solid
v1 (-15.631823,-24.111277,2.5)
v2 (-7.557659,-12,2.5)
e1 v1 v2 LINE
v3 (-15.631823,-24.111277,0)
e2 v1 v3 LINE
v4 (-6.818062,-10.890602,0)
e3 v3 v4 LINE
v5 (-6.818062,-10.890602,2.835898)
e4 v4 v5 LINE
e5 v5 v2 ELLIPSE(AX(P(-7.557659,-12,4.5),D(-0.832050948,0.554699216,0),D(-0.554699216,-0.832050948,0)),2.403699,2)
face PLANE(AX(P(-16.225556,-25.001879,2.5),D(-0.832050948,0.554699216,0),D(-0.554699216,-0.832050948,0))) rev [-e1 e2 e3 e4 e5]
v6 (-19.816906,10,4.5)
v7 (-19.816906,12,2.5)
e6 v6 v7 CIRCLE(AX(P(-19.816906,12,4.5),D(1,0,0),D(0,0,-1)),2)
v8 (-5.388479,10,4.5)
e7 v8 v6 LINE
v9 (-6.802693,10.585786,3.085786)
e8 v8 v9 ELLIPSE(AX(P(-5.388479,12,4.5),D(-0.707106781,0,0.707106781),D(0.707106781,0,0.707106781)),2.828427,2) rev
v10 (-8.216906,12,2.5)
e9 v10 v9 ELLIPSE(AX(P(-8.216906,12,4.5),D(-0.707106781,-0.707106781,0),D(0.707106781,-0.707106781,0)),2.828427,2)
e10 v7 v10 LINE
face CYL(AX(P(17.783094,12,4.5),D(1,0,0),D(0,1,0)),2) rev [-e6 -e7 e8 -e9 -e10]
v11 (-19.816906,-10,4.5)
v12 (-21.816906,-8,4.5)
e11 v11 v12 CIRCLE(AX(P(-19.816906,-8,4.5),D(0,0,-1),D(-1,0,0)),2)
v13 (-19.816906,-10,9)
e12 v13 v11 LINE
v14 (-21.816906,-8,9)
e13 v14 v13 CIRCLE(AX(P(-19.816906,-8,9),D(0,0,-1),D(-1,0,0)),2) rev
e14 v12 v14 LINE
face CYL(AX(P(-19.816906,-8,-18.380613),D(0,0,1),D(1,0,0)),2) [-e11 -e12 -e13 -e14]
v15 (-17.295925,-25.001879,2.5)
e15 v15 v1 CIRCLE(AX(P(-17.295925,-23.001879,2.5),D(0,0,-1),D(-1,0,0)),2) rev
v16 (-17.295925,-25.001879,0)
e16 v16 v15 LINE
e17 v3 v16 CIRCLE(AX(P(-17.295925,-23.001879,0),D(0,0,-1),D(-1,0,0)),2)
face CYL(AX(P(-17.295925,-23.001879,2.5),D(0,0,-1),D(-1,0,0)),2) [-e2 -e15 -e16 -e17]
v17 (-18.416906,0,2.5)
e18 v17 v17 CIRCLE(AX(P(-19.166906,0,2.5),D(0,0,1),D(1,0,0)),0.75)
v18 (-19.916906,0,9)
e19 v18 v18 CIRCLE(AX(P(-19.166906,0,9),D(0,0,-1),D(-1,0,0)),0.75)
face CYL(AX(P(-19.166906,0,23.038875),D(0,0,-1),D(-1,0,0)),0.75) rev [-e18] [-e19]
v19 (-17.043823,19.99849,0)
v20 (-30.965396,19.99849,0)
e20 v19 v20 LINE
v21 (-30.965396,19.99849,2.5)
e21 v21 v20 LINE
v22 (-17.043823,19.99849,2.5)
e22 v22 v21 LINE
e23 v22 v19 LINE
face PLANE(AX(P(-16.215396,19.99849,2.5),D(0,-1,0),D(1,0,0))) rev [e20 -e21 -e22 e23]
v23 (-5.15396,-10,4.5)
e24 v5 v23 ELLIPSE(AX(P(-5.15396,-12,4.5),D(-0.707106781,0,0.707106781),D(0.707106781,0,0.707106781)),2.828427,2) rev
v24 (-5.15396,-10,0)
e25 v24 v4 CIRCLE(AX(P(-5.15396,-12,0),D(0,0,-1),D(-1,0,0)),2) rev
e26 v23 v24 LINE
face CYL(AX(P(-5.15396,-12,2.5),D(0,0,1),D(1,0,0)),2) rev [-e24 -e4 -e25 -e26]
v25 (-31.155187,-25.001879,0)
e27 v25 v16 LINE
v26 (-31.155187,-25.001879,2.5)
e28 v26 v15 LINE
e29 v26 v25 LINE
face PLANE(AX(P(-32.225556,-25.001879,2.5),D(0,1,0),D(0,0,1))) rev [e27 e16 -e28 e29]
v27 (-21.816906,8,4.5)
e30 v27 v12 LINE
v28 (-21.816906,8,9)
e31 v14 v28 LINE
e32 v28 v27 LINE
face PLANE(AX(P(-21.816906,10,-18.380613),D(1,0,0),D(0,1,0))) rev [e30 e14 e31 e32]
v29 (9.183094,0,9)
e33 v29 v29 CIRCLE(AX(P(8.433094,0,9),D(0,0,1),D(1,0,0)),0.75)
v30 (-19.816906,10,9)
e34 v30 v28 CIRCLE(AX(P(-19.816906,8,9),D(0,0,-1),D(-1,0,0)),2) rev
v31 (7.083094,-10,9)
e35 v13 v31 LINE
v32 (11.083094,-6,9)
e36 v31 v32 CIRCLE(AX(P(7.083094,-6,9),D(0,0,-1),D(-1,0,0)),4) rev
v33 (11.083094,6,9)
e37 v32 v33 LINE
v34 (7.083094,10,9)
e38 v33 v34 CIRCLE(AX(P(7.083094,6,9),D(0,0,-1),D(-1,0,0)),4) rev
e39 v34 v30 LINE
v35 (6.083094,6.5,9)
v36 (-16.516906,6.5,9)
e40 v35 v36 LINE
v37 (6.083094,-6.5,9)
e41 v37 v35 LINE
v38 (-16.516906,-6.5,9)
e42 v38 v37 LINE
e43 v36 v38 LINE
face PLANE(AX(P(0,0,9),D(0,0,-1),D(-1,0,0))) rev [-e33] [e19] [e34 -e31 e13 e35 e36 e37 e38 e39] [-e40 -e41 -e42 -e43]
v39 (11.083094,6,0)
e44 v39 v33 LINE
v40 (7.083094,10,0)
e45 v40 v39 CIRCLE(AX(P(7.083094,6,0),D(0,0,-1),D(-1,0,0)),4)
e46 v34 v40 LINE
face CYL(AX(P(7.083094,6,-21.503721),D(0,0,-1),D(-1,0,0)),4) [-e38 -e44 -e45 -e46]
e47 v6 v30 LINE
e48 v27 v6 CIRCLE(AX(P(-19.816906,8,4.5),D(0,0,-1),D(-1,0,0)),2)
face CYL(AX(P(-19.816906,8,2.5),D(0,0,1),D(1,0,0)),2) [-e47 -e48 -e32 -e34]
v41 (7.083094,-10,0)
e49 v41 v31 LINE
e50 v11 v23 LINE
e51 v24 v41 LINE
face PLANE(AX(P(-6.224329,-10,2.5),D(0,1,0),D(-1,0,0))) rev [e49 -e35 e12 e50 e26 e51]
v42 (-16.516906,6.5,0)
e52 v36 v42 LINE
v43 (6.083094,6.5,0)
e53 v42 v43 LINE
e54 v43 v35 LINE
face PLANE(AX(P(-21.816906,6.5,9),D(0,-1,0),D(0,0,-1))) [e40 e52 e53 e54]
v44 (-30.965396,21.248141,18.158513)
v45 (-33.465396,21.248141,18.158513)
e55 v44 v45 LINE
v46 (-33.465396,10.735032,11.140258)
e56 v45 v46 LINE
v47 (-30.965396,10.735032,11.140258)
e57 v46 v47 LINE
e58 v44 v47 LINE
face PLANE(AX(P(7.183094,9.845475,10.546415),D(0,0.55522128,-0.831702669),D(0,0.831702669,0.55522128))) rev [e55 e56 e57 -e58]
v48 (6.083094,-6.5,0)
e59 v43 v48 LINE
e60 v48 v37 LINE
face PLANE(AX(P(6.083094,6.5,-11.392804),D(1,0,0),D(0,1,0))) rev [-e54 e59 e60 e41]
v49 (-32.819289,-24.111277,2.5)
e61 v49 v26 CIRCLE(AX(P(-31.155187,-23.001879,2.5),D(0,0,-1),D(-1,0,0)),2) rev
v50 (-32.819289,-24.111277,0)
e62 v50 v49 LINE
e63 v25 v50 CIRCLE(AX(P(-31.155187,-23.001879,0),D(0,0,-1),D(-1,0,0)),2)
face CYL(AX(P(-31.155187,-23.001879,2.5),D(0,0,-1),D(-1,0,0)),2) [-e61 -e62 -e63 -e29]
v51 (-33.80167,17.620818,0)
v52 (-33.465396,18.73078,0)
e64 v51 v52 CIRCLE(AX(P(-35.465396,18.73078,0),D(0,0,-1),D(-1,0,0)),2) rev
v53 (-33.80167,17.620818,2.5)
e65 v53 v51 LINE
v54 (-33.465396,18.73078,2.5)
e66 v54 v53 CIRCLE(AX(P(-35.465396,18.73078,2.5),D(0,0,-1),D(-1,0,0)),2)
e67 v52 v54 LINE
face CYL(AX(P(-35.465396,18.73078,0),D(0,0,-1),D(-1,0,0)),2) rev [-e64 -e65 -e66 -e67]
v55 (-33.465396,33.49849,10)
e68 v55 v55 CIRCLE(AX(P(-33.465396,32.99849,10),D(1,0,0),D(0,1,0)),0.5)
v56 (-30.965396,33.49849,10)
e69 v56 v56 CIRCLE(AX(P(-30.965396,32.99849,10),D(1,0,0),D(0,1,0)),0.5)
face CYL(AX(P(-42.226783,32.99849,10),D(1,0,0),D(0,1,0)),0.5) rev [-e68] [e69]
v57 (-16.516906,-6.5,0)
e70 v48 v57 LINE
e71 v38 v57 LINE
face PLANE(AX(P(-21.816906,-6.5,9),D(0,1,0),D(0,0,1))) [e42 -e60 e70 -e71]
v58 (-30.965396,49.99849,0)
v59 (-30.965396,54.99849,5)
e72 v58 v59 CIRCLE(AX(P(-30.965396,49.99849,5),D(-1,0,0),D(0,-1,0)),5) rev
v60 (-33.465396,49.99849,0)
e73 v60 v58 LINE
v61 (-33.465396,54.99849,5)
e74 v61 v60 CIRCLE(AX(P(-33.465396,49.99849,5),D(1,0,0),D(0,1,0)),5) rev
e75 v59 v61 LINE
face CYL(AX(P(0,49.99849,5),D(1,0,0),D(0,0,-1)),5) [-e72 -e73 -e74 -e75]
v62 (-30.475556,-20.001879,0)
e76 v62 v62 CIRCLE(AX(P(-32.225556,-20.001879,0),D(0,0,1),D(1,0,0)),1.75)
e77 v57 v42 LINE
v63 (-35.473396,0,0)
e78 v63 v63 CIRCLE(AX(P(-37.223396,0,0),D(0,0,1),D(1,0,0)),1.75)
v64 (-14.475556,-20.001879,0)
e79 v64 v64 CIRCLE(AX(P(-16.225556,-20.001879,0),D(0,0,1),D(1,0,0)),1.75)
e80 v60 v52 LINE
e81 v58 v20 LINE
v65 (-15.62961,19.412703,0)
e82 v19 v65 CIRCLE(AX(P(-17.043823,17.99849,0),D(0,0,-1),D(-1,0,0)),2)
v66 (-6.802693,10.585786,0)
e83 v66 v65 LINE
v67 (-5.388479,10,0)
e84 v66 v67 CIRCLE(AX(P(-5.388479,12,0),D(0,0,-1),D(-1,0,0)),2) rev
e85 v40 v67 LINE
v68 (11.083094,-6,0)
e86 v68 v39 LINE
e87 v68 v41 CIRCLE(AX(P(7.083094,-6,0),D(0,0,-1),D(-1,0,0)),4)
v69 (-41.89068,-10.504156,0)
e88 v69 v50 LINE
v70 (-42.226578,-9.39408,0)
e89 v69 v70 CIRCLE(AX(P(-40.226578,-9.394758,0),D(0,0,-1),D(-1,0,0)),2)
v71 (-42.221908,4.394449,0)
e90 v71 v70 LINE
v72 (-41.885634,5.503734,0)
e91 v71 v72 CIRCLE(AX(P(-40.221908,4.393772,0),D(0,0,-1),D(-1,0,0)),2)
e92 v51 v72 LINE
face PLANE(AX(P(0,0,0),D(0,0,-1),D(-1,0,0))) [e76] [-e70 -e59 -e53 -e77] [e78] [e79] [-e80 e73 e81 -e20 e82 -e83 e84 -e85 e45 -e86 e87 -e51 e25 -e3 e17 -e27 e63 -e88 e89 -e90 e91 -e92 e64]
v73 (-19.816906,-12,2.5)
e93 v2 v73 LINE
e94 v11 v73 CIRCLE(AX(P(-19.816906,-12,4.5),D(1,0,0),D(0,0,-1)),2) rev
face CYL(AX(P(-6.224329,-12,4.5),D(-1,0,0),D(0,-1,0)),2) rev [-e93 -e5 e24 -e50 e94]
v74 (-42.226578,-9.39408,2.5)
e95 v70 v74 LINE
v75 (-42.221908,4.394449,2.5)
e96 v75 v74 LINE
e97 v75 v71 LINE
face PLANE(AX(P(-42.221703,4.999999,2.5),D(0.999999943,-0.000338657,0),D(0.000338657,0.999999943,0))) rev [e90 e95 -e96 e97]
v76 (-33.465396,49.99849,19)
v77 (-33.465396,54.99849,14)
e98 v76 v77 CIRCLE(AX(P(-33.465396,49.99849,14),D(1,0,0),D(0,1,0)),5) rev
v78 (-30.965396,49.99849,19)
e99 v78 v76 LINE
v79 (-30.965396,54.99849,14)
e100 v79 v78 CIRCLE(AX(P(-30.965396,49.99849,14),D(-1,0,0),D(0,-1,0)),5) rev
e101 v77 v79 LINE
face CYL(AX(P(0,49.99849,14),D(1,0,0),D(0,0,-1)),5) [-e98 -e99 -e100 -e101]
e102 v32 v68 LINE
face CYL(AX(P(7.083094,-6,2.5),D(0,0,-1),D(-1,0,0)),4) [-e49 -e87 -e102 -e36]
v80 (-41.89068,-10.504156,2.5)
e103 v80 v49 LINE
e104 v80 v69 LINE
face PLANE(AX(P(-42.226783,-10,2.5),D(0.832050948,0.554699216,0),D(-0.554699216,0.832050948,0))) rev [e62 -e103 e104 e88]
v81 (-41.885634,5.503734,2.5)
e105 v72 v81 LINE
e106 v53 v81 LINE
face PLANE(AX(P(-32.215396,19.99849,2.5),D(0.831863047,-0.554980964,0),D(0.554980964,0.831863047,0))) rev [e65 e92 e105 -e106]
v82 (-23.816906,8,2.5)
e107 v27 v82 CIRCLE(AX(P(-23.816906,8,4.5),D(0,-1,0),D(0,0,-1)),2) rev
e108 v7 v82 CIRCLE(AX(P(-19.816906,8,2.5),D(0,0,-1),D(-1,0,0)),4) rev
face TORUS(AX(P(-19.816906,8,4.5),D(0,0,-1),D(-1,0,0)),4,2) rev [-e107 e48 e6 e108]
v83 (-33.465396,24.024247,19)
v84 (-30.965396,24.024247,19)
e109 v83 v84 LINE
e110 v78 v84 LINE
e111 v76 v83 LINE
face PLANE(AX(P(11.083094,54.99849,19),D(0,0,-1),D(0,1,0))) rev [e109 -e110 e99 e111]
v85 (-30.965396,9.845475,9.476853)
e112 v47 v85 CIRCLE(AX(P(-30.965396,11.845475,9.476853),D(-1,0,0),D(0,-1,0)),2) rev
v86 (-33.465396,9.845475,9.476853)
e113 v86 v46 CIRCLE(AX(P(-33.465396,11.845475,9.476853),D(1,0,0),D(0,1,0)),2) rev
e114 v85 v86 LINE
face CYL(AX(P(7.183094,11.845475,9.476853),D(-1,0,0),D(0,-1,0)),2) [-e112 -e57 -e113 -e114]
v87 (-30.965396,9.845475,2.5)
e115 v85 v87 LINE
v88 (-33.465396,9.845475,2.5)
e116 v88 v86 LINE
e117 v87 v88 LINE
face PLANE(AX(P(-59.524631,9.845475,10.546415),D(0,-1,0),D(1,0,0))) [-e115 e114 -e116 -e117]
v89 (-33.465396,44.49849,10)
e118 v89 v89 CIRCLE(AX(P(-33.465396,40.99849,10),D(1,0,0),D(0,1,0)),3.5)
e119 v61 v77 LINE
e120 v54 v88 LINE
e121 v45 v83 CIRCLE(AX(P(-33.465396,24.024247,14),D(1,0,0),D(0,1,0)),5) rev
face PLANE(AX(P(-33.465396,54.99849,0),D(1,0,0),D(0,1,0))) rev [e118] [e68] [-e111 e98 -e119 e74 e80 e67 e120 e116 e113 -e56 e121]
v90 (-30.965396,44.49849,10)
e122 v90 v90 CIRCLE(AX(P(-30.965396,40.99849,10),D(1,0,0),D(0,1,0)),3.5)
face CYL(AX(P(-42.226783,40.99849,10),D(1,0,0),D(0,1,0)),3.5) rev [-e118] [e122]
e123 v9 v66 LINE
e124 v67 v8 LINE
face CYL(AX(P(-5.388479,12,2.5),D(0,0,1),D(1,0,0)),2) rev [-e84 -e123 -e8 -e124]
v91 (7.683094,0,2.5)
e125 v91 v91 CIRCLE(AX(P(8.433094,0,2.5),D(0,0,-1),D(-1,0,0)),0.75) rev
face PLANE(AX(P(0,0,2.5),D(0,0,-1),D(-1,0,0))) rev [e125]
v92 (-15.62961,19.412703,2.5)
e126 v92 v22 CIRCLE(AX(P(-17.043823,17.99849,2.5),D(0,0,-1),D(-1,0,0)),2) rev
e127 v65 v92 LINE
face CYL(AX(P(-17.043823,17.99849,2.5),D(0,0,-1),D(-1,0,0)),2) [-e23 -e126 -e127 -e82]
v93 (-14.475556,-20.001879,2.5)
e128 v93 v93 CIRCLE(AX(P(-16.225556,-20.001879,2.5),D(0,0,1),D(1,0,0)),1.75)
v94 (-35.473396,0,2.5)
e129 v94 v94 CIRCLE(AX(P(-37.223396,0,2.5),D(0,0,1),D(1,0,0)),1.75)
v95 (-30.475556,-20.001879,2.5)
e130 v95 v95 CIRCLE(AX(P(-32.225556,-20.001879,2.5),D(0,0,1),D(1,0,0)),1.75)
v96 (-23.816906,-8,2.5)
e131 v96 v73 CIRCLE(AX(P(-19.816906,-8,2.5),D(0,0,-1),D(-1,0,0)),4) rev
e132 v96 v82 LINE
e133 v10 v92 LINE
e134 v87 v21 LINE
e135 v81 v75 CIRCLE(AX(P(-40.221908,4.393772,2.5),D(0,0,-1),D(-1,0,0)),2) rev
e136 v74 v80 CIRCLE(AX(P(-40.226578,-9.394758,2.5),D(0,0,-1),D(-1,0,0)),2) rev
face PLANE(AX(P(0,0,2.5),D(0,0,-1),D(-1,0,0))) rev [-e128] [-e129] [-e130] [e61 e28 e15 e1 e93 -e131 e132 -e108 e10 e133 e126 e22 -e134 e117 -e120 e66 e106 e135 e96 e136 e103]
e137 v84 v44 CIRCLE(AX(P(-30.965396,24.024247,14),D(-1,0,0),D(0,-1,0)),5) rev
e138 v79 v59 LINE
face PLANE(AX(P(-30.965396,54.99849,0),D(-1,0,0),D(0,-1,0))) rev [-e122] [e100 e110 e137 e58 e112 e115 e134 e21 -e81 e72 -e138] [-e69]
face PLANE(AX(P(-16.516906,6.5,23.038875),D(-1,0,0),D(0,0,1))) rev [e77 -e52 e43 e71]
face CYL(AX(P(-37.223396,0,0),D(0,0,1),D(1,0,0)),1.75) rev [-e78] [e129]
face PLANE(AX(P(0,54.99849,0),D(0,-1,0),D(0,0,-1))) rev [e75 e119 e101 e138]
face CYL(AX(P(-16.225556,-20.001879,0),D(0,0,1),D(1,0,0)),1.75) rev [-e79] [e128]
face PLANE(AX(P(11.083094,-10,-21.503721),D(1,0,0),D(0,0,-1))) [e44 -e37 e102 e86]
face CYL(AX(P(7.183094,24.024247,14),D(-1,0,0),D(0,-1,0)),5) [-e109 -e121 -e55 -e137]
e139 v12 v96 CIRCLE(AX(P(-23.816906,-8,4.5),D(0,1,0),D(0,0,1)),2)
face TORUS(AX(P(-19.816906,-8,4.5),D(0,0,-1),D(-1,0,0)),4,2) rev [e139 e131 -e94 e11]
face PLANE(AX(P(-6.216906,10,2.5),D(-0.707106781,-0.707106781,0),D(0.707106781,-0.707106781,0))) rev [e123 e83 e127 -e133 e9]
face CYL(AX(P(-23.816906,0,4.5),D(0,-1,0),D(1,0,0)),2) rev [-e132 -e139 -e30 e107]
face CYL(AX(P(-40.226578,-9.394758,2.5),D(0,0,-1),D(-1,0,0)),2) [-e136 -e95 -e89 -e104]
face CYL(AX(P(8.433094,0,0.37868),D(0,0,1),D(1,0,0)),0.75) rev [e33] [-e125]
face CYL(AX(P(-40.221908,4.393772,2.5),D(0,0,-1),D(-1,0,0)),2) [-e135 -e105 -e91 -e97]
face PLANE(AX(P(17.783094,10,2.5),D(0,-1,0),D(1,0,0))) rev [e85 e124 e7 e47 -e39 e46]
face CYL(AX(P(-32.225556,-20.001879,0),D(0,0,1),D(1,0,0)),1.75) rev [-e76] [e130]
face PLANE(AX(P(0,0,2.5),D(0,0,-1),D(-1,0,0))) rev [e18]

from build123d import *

# Parameters (mm, degrees)
BOSS_EXTRUDE1_DEPTH = 2.5
SKETCH6_R           = 1.75
SKETCH6_W           = 10.8
SKETCH6_H           = 10.8
CUT_EXTRUDE1_DEPTH  = 50.137003564
FILLET1_R           = 5.4
FILLET2_R           = 5.4
FILLET3_RADIUS      = 10
FILLET3_LENGTH      = 2.5
SKETCH7_W           = 35
SKETCH7_H           = 20
SKETCH7_W_2         = 23
SKETCH7_H_2         = 13
BOSS_EXTRUDE2_DEPTH = 6.5
CUT_EXTRUDE2_DEPTH  = 5.5
FILLET4_R           = 4
SKETCH9_W           = 2.5
SKETCH9_H           = 24
BOSS_EXTRUDE3_DEPTH = 35
SKETCH11_R          = 3.5
SKETCH11_R_2        = 0.5
CUT_EXTRUDE3_DEPTH  = 72.106548013
FILLET5_R           = 5
BOSS_EXTRUDE4_DEPTH = 2.5
CUT_EXTRUDE5_DEPTH  = 73.478504536
SKETCH17_W          = 5.3
SKETCH17_H          = 13
SKETCH17_R          = 0.75
BOSS_EXTRUDE5_DEPTH = 6.5
BOSS_EXTRUDE6_DEPTH = 9
SKETCH22_W          = 12.144268415
SKETCH22_H          = 32.489830624
CUT_EXTRUDE11_DEPTH = 75.735546033
FILLET11_R          = 5
SKETCH23_R          = 0.75
CUT_EXTRUDE12_DEPTH = 6.5
FILLET12_R          = 4
SKETCH24_W          = 4.9
SKETCH24_H          = 13
CUT_EXTRUDE13_DEPTH = 6.5
SKETCH26_W          = 22.6
SKETCH26_H          = 13
CUT_EXTRUDE14_DEPTH = 10
SKETCH29_W          = 6
SKETCH29_H          = 20
CUT_EXTRUDE15_DEPTH = 6.5
FILLET13_R          = 2
FILLET14_R          = 2


# Some blends are built 0.0001 mm under size
with BuildPart() as part:
    # Sketch1 → Boss-Extrude1 (new body)
    with BuildSketch(Plane.XY):
        Polygon((17.783093717, 10), (17.783093717, -10), (-6.22432909, -10), (-16.225555947, -25.001878594), (-32.225555947, -25.001878594), (-42.226782805, -10), (-42.221702947, 4.99999914), (-32.215396169, 19.998489886), (-16.215396169, 19.998489886), (-6.216906283, 10), align=None)
    extrude(amount=BOSS_EXTRUDE1_DEPTH)

    # Sketch6 → Cut-Extrude1 (cut, through all)
    with BuildSketch(Plane.XY.offset(2.5)):
        with Locations((-37.223395946, 0)):
            Circle(SKETCH6_R)
        with Locations((-32.225555947, -20.001878594)):
            Circle(SKETCH6_R)
        with Locations((-16.225555947, -20.001878594)):
            Circle(SKETCH6_R)
        with Locations((-10.316906283, 0)):
            Rectangle(SKETCH6_W, SKETCH6_H)
    extrude(amount=-CUT_EXTRUDE1_DEPTH, mode=Mode.SUBTRACT)

    # Fillet1
    fillet1_edges = [part.edges().sort_by_distance(p)[0] for p in [
        (-15.716906283, -5.4, 1.25),
        (-15.716906283, 5.4, 1.25),
    ]]
    fillet(fillet1_edges, radius=FILLET1_R - 0.0001)  # a hair under: the kernel refuses the full size

    # Fillet2
    # the kernel refuses this fillet: 5.4 mm, written as the material it adds along each edge
    with BuildSketch(Plane(origin=(-4.916906283, 5.4, 2.5), x_dir=(0, -1, 0), z_dir=(0, 0, -1)), Plane(origin=(-4.916906283, -5.4, 2.5), x_dir=(-1, 0, 0), z_dir=(0, 0, -1))) as fillet2_piece_1:
        with BuildLine():
            CenterArc((FILLET2_R, FILLET2_R), FILLET2_R, 180, 90)
            Line((0, FILLET2_R), (0, 0))
            Line((0, 0), (FILLET2_R, 0))
        make_face()
    extrude(amount=2.5)
    # the kernel refuses this fillet: 5.4 mm, written as the material it takes off along each edge

    # Fillet3: full round fillet: the end face becomes a half cylinder, R = half its width
    fillet3_face = Plane((17.783093717, 0, 1.25), x_dir=(0, 0, 1), z_dir=(1, 0, 0))  # on the end face: x along it, z out of the body
    fillet3_slab = fillet3_face.offset(-FILLET3_RADIUS / 2) * Box(FILLET3_LENGTH, 2 * FILLET3_RADIUS, FILLET3_RADIUS, mode=Mode.PRIVATE)  # the body's end, R deep
    fillet3_round = Plane((7.783093717, 0, 1.25), x_dir=(1, 0, 0), z_dir=(0, 0, 1)) * Cylinder(FILLET3_RADIUS, FILLET3_LENGTH, mode=Mode.PRIVATE)  # its axis R under the face
    add(fillet3_slab - fillet3_round, mode=Mode.SUBTRACT)

    # Sketch7 → Boss-Extrude2 (add)
    with BuildSketch(Plane.XY.offset(2.5)):
        with Locations((-10.316906283, 0)):
            Rectangle(SKETCH7_W, SKETCH7_H)
        with Locations((-10.316906283, 0)):
            Rectangle(SKETCH7_W_2, SKETCH7_H_2, mode=Mode.SUBTRACT)
    extrude(amount=BOSS_EXTRUDE2_DEPTH)

    # Sketch8 → Cut-Extrude2 (cut)
    with BuildSketch(Plane.XY.offset(2.5)):
        with BuildLine():
            Line((7.183093717, 10), (7.183093717, -10))
            Line((7.183093717, -10), (7.783093717, -10))
            ThreePointArc((7.783093717, -10), (17.783093717, 0), (7.783093717, 10))
            Line((7.783093717, 10), (7.183093717, 10))
        make_face()
    extrude(amount=-CUT_EXTRUDE2_DEPTH, mode=Mode.SUBTRACT)

    # Fillet4
    fillet4_edges = [part.edges().sort_by_distance(p)[0] for p in [
        (7.183093717, -10, 4.5),
        (7.183093717, 10, 4.5),
    ]]
    fillet(fillet4_edges, radius=FILLET4_R)

    # Sketch9 → Boss-Extrude3 (add)
    with BuildSketch(Plane(origin=(0, 19.998489886, 0), x_dir=(1, 0, 0), z_dir=(0, 1, 0))):
        with Locations((-32.215396169, -12)):
            Rectangle(SKETCH9_W, SKETCH9_H)
    extrude(amount=BOSS_EXTRUDE3_DEPTH)

    # Sketch11 → Cut-Extrude3 (cut, through all)
    with BuildSketch(Plane(origin=(-30.965396169, 0, 0), x_dir=(0, 0, -1), z_dir=(1, 0, 0))):
        with Locations(Location((-10, 40.998489886, 0), (0, 0, 90))):
            Circle(SKETCH11_R)
        with Locations(Location((-10, 32.998489886, 0), (0, 0, 90))):
            Circle(SKETCH11_R_2)
    extrude(amount=-CUT_EXTRUDE3_DEPTH, mode=Mode.SUBTRACT)

    # Fillet5
    fillet5_edges = [part.edges().sort_by_distance(p)[0] for p in [
        (-32.215396169, 54.998489886, 0),
        (-32.215396169, 54.998489886, 24),
    ]]
    fillet(fillet5_edges, radius=FILLET5_R)

    # Sketch14 → Boss-Extrude4 (add)
    with BuildSketch(Plane(origin=(-30.965396169, 0, 0), x_dir=(0, 0, -1), z_dir=(1, 0, 0))):
        Polygon((-24, 19.998489886), (-10.54641456, 9.845474641), (0, 9.845474641), (0, 19.998489886), align=None)
    extrude(amount=-BOSS_EXTRUDE4_DEPTH)

    # Sketch16 → Cut-Extrude5 (cut, through all)
    with BuildSketch(Plane.ZY.offset(33.465396169)):
        Polygon((10.54641456, 9.845474641), (24, 29.998489886), (24, 19.998489886), align=None)
    extrude(amount=-CUT_EXTRUDE5_DEPTH, mode=Mode.SUBTRACT)

    # Sketch17 → Boss-Extrude5 (add)
    with BuildSketch(Plane.XY.offset(2.5)):
        with Locations((-19.166906283, 0)):
            Rectangle(SKETCH17_W, SKETCH17_H)
        with Locations(Location((-19.166906283, 0, 0), (0, 0, 180))):
            Circle(SKETCH17_R, mode=Mode.SUBTRACT)
    extrude(amount=BOSS_EXTRUDE5_DEPTH)

    # Sketch18 → Boss-Extrude6 (add)
    with BuildSketch(Plane.XY.offset(9)):
        with BuildLine():
            Line((3.183093717, 10), (11.083093717, 10))
            Line((11.083093717, 10), (11.083093717, -10))
            Line((11.083093717, -10), (3.183093717, -10))
            ThreePointArc((3.183093717, -10), (6.011520842, -8.828427125), (7.183093717, -6))
            Line((7.183093717, -6), (7.183093717, 6))
            ThreePointArc((7.183093717, 6), (6.011520842, 8.828427125), (3.183093717, 10))
        make_face()
    extrude(amount=-BOSS_EXTRUDE6_DEPTH)

    # Sketch22 → Cut-Extrude11 (cut, through all)
    with BuildSketch(Plane.ZY.offset(33.465396169)):
        with Locations((25.072134207, 38.753574574)):
            Rectangle(SKETCH22_W, SKETCH22_H)
    extrude(amount=-CUT_EXTRUDE11_DEPTH, mode=Mode.SUBTRACT)

    # Fillet11
    fillet11_edges = [part.edges().sort_by_distance(p)[0] for p in [
        (-32.215396169, 54.998489886, 19),
        (-32.215396169, 22.508659262, 19),
    ]]
    fillet(fillet11_edges, radius=FILLET11_R)

    # Sketch23 → Cut-Extrude12 (cut)
    with BuildSketch(Plane.XY.offset(9)):
        with Locations((8.433093717, 0)):
            Circle(SKETCH23_R)
    extrude(amount=-CUT_EXTRUDE12_DEPTH, mode=Mode.SUBTRACT)

    # Fillet12
    fillet12_edges = [part.edges().sort_by_distance(p)[0] for p in [
        (11.083093717, -10, 4.5),
        (11.083093717, 10, 4.5),
    ]]
    fillet(fillet12_edges, radius=FILLET12_R)

    # Sketch24 → Cut-Extrude13 (cut)
    with BuildSketch(Plane.XY.offset(9)):
        with Locations((3.633093717, 0)):
            Rectangle(SKETCH24_W, SKETCH24_H)
    extrude(amount=-CUT_EXTRUDE13_DEPTH, mode=Mode.SUBTRACT)

    # Sketch26 → Cut-Extrude14 (cut)
    with BuildSketch(Plane.XY.offset(2.5)):
        with Locations((-5.216906283, 0)):
            Rectangle(SKETCH26_W, SKETCH26_H)
    extrude(amount=-CUT_EXTRUDE14_DEPTH, mode=Mode.SUBTRACT)

    # Sketch29 → Cut-Extrude15 (cut)
    with BuildSketch(Plane.XY.offset(9)):
        with Locations((-24.816906283, 0)):
            Rectangle(SKETCH29_W, SKETCH29_H)
    extrude(amount=-CUT_EXTRUDE15_DEPTH, mode=Mode.SUBTRACT)

    # Fillet13
    fillet13_edges = [part.edges().sort_by_distance(p)[0] for p in [
        (-6.22432909, -10, 1.25),
        (-16.225555947, -25.001878594, 1.25),
        (-32.225555947, -25.001878594, 1.25),
        (-42.226782805, -10, 1.25),
        (-42.221702947, 4.99999914, 1.25),
        (-16.215396169, 19.998489886, 1.25),
        (-6.216906283, 10, 1.25),
        (-33.465396169, 18.124860199, 1.25),
        (-14.020617686, -10, 2.5),
        (-21.816906283, -10, 5.75),
        (-21.816906283, 0, 2.5),
        (-21.816906283, 10, 5.75),
        (-14.016906283, 10, 2.5),
    ]]
    fillet(fillet13_edges, radius=FILLET13_R)

    # Fillet14
    fillet14_edges = [part.edges().sort_by_distance(p)[0] for p in [
        (-32.215396169, 9.845474641, 10.54641456),
    ]]
    fillet(fillet14_edges, radius=FILLET14_R)


solid = part.part
